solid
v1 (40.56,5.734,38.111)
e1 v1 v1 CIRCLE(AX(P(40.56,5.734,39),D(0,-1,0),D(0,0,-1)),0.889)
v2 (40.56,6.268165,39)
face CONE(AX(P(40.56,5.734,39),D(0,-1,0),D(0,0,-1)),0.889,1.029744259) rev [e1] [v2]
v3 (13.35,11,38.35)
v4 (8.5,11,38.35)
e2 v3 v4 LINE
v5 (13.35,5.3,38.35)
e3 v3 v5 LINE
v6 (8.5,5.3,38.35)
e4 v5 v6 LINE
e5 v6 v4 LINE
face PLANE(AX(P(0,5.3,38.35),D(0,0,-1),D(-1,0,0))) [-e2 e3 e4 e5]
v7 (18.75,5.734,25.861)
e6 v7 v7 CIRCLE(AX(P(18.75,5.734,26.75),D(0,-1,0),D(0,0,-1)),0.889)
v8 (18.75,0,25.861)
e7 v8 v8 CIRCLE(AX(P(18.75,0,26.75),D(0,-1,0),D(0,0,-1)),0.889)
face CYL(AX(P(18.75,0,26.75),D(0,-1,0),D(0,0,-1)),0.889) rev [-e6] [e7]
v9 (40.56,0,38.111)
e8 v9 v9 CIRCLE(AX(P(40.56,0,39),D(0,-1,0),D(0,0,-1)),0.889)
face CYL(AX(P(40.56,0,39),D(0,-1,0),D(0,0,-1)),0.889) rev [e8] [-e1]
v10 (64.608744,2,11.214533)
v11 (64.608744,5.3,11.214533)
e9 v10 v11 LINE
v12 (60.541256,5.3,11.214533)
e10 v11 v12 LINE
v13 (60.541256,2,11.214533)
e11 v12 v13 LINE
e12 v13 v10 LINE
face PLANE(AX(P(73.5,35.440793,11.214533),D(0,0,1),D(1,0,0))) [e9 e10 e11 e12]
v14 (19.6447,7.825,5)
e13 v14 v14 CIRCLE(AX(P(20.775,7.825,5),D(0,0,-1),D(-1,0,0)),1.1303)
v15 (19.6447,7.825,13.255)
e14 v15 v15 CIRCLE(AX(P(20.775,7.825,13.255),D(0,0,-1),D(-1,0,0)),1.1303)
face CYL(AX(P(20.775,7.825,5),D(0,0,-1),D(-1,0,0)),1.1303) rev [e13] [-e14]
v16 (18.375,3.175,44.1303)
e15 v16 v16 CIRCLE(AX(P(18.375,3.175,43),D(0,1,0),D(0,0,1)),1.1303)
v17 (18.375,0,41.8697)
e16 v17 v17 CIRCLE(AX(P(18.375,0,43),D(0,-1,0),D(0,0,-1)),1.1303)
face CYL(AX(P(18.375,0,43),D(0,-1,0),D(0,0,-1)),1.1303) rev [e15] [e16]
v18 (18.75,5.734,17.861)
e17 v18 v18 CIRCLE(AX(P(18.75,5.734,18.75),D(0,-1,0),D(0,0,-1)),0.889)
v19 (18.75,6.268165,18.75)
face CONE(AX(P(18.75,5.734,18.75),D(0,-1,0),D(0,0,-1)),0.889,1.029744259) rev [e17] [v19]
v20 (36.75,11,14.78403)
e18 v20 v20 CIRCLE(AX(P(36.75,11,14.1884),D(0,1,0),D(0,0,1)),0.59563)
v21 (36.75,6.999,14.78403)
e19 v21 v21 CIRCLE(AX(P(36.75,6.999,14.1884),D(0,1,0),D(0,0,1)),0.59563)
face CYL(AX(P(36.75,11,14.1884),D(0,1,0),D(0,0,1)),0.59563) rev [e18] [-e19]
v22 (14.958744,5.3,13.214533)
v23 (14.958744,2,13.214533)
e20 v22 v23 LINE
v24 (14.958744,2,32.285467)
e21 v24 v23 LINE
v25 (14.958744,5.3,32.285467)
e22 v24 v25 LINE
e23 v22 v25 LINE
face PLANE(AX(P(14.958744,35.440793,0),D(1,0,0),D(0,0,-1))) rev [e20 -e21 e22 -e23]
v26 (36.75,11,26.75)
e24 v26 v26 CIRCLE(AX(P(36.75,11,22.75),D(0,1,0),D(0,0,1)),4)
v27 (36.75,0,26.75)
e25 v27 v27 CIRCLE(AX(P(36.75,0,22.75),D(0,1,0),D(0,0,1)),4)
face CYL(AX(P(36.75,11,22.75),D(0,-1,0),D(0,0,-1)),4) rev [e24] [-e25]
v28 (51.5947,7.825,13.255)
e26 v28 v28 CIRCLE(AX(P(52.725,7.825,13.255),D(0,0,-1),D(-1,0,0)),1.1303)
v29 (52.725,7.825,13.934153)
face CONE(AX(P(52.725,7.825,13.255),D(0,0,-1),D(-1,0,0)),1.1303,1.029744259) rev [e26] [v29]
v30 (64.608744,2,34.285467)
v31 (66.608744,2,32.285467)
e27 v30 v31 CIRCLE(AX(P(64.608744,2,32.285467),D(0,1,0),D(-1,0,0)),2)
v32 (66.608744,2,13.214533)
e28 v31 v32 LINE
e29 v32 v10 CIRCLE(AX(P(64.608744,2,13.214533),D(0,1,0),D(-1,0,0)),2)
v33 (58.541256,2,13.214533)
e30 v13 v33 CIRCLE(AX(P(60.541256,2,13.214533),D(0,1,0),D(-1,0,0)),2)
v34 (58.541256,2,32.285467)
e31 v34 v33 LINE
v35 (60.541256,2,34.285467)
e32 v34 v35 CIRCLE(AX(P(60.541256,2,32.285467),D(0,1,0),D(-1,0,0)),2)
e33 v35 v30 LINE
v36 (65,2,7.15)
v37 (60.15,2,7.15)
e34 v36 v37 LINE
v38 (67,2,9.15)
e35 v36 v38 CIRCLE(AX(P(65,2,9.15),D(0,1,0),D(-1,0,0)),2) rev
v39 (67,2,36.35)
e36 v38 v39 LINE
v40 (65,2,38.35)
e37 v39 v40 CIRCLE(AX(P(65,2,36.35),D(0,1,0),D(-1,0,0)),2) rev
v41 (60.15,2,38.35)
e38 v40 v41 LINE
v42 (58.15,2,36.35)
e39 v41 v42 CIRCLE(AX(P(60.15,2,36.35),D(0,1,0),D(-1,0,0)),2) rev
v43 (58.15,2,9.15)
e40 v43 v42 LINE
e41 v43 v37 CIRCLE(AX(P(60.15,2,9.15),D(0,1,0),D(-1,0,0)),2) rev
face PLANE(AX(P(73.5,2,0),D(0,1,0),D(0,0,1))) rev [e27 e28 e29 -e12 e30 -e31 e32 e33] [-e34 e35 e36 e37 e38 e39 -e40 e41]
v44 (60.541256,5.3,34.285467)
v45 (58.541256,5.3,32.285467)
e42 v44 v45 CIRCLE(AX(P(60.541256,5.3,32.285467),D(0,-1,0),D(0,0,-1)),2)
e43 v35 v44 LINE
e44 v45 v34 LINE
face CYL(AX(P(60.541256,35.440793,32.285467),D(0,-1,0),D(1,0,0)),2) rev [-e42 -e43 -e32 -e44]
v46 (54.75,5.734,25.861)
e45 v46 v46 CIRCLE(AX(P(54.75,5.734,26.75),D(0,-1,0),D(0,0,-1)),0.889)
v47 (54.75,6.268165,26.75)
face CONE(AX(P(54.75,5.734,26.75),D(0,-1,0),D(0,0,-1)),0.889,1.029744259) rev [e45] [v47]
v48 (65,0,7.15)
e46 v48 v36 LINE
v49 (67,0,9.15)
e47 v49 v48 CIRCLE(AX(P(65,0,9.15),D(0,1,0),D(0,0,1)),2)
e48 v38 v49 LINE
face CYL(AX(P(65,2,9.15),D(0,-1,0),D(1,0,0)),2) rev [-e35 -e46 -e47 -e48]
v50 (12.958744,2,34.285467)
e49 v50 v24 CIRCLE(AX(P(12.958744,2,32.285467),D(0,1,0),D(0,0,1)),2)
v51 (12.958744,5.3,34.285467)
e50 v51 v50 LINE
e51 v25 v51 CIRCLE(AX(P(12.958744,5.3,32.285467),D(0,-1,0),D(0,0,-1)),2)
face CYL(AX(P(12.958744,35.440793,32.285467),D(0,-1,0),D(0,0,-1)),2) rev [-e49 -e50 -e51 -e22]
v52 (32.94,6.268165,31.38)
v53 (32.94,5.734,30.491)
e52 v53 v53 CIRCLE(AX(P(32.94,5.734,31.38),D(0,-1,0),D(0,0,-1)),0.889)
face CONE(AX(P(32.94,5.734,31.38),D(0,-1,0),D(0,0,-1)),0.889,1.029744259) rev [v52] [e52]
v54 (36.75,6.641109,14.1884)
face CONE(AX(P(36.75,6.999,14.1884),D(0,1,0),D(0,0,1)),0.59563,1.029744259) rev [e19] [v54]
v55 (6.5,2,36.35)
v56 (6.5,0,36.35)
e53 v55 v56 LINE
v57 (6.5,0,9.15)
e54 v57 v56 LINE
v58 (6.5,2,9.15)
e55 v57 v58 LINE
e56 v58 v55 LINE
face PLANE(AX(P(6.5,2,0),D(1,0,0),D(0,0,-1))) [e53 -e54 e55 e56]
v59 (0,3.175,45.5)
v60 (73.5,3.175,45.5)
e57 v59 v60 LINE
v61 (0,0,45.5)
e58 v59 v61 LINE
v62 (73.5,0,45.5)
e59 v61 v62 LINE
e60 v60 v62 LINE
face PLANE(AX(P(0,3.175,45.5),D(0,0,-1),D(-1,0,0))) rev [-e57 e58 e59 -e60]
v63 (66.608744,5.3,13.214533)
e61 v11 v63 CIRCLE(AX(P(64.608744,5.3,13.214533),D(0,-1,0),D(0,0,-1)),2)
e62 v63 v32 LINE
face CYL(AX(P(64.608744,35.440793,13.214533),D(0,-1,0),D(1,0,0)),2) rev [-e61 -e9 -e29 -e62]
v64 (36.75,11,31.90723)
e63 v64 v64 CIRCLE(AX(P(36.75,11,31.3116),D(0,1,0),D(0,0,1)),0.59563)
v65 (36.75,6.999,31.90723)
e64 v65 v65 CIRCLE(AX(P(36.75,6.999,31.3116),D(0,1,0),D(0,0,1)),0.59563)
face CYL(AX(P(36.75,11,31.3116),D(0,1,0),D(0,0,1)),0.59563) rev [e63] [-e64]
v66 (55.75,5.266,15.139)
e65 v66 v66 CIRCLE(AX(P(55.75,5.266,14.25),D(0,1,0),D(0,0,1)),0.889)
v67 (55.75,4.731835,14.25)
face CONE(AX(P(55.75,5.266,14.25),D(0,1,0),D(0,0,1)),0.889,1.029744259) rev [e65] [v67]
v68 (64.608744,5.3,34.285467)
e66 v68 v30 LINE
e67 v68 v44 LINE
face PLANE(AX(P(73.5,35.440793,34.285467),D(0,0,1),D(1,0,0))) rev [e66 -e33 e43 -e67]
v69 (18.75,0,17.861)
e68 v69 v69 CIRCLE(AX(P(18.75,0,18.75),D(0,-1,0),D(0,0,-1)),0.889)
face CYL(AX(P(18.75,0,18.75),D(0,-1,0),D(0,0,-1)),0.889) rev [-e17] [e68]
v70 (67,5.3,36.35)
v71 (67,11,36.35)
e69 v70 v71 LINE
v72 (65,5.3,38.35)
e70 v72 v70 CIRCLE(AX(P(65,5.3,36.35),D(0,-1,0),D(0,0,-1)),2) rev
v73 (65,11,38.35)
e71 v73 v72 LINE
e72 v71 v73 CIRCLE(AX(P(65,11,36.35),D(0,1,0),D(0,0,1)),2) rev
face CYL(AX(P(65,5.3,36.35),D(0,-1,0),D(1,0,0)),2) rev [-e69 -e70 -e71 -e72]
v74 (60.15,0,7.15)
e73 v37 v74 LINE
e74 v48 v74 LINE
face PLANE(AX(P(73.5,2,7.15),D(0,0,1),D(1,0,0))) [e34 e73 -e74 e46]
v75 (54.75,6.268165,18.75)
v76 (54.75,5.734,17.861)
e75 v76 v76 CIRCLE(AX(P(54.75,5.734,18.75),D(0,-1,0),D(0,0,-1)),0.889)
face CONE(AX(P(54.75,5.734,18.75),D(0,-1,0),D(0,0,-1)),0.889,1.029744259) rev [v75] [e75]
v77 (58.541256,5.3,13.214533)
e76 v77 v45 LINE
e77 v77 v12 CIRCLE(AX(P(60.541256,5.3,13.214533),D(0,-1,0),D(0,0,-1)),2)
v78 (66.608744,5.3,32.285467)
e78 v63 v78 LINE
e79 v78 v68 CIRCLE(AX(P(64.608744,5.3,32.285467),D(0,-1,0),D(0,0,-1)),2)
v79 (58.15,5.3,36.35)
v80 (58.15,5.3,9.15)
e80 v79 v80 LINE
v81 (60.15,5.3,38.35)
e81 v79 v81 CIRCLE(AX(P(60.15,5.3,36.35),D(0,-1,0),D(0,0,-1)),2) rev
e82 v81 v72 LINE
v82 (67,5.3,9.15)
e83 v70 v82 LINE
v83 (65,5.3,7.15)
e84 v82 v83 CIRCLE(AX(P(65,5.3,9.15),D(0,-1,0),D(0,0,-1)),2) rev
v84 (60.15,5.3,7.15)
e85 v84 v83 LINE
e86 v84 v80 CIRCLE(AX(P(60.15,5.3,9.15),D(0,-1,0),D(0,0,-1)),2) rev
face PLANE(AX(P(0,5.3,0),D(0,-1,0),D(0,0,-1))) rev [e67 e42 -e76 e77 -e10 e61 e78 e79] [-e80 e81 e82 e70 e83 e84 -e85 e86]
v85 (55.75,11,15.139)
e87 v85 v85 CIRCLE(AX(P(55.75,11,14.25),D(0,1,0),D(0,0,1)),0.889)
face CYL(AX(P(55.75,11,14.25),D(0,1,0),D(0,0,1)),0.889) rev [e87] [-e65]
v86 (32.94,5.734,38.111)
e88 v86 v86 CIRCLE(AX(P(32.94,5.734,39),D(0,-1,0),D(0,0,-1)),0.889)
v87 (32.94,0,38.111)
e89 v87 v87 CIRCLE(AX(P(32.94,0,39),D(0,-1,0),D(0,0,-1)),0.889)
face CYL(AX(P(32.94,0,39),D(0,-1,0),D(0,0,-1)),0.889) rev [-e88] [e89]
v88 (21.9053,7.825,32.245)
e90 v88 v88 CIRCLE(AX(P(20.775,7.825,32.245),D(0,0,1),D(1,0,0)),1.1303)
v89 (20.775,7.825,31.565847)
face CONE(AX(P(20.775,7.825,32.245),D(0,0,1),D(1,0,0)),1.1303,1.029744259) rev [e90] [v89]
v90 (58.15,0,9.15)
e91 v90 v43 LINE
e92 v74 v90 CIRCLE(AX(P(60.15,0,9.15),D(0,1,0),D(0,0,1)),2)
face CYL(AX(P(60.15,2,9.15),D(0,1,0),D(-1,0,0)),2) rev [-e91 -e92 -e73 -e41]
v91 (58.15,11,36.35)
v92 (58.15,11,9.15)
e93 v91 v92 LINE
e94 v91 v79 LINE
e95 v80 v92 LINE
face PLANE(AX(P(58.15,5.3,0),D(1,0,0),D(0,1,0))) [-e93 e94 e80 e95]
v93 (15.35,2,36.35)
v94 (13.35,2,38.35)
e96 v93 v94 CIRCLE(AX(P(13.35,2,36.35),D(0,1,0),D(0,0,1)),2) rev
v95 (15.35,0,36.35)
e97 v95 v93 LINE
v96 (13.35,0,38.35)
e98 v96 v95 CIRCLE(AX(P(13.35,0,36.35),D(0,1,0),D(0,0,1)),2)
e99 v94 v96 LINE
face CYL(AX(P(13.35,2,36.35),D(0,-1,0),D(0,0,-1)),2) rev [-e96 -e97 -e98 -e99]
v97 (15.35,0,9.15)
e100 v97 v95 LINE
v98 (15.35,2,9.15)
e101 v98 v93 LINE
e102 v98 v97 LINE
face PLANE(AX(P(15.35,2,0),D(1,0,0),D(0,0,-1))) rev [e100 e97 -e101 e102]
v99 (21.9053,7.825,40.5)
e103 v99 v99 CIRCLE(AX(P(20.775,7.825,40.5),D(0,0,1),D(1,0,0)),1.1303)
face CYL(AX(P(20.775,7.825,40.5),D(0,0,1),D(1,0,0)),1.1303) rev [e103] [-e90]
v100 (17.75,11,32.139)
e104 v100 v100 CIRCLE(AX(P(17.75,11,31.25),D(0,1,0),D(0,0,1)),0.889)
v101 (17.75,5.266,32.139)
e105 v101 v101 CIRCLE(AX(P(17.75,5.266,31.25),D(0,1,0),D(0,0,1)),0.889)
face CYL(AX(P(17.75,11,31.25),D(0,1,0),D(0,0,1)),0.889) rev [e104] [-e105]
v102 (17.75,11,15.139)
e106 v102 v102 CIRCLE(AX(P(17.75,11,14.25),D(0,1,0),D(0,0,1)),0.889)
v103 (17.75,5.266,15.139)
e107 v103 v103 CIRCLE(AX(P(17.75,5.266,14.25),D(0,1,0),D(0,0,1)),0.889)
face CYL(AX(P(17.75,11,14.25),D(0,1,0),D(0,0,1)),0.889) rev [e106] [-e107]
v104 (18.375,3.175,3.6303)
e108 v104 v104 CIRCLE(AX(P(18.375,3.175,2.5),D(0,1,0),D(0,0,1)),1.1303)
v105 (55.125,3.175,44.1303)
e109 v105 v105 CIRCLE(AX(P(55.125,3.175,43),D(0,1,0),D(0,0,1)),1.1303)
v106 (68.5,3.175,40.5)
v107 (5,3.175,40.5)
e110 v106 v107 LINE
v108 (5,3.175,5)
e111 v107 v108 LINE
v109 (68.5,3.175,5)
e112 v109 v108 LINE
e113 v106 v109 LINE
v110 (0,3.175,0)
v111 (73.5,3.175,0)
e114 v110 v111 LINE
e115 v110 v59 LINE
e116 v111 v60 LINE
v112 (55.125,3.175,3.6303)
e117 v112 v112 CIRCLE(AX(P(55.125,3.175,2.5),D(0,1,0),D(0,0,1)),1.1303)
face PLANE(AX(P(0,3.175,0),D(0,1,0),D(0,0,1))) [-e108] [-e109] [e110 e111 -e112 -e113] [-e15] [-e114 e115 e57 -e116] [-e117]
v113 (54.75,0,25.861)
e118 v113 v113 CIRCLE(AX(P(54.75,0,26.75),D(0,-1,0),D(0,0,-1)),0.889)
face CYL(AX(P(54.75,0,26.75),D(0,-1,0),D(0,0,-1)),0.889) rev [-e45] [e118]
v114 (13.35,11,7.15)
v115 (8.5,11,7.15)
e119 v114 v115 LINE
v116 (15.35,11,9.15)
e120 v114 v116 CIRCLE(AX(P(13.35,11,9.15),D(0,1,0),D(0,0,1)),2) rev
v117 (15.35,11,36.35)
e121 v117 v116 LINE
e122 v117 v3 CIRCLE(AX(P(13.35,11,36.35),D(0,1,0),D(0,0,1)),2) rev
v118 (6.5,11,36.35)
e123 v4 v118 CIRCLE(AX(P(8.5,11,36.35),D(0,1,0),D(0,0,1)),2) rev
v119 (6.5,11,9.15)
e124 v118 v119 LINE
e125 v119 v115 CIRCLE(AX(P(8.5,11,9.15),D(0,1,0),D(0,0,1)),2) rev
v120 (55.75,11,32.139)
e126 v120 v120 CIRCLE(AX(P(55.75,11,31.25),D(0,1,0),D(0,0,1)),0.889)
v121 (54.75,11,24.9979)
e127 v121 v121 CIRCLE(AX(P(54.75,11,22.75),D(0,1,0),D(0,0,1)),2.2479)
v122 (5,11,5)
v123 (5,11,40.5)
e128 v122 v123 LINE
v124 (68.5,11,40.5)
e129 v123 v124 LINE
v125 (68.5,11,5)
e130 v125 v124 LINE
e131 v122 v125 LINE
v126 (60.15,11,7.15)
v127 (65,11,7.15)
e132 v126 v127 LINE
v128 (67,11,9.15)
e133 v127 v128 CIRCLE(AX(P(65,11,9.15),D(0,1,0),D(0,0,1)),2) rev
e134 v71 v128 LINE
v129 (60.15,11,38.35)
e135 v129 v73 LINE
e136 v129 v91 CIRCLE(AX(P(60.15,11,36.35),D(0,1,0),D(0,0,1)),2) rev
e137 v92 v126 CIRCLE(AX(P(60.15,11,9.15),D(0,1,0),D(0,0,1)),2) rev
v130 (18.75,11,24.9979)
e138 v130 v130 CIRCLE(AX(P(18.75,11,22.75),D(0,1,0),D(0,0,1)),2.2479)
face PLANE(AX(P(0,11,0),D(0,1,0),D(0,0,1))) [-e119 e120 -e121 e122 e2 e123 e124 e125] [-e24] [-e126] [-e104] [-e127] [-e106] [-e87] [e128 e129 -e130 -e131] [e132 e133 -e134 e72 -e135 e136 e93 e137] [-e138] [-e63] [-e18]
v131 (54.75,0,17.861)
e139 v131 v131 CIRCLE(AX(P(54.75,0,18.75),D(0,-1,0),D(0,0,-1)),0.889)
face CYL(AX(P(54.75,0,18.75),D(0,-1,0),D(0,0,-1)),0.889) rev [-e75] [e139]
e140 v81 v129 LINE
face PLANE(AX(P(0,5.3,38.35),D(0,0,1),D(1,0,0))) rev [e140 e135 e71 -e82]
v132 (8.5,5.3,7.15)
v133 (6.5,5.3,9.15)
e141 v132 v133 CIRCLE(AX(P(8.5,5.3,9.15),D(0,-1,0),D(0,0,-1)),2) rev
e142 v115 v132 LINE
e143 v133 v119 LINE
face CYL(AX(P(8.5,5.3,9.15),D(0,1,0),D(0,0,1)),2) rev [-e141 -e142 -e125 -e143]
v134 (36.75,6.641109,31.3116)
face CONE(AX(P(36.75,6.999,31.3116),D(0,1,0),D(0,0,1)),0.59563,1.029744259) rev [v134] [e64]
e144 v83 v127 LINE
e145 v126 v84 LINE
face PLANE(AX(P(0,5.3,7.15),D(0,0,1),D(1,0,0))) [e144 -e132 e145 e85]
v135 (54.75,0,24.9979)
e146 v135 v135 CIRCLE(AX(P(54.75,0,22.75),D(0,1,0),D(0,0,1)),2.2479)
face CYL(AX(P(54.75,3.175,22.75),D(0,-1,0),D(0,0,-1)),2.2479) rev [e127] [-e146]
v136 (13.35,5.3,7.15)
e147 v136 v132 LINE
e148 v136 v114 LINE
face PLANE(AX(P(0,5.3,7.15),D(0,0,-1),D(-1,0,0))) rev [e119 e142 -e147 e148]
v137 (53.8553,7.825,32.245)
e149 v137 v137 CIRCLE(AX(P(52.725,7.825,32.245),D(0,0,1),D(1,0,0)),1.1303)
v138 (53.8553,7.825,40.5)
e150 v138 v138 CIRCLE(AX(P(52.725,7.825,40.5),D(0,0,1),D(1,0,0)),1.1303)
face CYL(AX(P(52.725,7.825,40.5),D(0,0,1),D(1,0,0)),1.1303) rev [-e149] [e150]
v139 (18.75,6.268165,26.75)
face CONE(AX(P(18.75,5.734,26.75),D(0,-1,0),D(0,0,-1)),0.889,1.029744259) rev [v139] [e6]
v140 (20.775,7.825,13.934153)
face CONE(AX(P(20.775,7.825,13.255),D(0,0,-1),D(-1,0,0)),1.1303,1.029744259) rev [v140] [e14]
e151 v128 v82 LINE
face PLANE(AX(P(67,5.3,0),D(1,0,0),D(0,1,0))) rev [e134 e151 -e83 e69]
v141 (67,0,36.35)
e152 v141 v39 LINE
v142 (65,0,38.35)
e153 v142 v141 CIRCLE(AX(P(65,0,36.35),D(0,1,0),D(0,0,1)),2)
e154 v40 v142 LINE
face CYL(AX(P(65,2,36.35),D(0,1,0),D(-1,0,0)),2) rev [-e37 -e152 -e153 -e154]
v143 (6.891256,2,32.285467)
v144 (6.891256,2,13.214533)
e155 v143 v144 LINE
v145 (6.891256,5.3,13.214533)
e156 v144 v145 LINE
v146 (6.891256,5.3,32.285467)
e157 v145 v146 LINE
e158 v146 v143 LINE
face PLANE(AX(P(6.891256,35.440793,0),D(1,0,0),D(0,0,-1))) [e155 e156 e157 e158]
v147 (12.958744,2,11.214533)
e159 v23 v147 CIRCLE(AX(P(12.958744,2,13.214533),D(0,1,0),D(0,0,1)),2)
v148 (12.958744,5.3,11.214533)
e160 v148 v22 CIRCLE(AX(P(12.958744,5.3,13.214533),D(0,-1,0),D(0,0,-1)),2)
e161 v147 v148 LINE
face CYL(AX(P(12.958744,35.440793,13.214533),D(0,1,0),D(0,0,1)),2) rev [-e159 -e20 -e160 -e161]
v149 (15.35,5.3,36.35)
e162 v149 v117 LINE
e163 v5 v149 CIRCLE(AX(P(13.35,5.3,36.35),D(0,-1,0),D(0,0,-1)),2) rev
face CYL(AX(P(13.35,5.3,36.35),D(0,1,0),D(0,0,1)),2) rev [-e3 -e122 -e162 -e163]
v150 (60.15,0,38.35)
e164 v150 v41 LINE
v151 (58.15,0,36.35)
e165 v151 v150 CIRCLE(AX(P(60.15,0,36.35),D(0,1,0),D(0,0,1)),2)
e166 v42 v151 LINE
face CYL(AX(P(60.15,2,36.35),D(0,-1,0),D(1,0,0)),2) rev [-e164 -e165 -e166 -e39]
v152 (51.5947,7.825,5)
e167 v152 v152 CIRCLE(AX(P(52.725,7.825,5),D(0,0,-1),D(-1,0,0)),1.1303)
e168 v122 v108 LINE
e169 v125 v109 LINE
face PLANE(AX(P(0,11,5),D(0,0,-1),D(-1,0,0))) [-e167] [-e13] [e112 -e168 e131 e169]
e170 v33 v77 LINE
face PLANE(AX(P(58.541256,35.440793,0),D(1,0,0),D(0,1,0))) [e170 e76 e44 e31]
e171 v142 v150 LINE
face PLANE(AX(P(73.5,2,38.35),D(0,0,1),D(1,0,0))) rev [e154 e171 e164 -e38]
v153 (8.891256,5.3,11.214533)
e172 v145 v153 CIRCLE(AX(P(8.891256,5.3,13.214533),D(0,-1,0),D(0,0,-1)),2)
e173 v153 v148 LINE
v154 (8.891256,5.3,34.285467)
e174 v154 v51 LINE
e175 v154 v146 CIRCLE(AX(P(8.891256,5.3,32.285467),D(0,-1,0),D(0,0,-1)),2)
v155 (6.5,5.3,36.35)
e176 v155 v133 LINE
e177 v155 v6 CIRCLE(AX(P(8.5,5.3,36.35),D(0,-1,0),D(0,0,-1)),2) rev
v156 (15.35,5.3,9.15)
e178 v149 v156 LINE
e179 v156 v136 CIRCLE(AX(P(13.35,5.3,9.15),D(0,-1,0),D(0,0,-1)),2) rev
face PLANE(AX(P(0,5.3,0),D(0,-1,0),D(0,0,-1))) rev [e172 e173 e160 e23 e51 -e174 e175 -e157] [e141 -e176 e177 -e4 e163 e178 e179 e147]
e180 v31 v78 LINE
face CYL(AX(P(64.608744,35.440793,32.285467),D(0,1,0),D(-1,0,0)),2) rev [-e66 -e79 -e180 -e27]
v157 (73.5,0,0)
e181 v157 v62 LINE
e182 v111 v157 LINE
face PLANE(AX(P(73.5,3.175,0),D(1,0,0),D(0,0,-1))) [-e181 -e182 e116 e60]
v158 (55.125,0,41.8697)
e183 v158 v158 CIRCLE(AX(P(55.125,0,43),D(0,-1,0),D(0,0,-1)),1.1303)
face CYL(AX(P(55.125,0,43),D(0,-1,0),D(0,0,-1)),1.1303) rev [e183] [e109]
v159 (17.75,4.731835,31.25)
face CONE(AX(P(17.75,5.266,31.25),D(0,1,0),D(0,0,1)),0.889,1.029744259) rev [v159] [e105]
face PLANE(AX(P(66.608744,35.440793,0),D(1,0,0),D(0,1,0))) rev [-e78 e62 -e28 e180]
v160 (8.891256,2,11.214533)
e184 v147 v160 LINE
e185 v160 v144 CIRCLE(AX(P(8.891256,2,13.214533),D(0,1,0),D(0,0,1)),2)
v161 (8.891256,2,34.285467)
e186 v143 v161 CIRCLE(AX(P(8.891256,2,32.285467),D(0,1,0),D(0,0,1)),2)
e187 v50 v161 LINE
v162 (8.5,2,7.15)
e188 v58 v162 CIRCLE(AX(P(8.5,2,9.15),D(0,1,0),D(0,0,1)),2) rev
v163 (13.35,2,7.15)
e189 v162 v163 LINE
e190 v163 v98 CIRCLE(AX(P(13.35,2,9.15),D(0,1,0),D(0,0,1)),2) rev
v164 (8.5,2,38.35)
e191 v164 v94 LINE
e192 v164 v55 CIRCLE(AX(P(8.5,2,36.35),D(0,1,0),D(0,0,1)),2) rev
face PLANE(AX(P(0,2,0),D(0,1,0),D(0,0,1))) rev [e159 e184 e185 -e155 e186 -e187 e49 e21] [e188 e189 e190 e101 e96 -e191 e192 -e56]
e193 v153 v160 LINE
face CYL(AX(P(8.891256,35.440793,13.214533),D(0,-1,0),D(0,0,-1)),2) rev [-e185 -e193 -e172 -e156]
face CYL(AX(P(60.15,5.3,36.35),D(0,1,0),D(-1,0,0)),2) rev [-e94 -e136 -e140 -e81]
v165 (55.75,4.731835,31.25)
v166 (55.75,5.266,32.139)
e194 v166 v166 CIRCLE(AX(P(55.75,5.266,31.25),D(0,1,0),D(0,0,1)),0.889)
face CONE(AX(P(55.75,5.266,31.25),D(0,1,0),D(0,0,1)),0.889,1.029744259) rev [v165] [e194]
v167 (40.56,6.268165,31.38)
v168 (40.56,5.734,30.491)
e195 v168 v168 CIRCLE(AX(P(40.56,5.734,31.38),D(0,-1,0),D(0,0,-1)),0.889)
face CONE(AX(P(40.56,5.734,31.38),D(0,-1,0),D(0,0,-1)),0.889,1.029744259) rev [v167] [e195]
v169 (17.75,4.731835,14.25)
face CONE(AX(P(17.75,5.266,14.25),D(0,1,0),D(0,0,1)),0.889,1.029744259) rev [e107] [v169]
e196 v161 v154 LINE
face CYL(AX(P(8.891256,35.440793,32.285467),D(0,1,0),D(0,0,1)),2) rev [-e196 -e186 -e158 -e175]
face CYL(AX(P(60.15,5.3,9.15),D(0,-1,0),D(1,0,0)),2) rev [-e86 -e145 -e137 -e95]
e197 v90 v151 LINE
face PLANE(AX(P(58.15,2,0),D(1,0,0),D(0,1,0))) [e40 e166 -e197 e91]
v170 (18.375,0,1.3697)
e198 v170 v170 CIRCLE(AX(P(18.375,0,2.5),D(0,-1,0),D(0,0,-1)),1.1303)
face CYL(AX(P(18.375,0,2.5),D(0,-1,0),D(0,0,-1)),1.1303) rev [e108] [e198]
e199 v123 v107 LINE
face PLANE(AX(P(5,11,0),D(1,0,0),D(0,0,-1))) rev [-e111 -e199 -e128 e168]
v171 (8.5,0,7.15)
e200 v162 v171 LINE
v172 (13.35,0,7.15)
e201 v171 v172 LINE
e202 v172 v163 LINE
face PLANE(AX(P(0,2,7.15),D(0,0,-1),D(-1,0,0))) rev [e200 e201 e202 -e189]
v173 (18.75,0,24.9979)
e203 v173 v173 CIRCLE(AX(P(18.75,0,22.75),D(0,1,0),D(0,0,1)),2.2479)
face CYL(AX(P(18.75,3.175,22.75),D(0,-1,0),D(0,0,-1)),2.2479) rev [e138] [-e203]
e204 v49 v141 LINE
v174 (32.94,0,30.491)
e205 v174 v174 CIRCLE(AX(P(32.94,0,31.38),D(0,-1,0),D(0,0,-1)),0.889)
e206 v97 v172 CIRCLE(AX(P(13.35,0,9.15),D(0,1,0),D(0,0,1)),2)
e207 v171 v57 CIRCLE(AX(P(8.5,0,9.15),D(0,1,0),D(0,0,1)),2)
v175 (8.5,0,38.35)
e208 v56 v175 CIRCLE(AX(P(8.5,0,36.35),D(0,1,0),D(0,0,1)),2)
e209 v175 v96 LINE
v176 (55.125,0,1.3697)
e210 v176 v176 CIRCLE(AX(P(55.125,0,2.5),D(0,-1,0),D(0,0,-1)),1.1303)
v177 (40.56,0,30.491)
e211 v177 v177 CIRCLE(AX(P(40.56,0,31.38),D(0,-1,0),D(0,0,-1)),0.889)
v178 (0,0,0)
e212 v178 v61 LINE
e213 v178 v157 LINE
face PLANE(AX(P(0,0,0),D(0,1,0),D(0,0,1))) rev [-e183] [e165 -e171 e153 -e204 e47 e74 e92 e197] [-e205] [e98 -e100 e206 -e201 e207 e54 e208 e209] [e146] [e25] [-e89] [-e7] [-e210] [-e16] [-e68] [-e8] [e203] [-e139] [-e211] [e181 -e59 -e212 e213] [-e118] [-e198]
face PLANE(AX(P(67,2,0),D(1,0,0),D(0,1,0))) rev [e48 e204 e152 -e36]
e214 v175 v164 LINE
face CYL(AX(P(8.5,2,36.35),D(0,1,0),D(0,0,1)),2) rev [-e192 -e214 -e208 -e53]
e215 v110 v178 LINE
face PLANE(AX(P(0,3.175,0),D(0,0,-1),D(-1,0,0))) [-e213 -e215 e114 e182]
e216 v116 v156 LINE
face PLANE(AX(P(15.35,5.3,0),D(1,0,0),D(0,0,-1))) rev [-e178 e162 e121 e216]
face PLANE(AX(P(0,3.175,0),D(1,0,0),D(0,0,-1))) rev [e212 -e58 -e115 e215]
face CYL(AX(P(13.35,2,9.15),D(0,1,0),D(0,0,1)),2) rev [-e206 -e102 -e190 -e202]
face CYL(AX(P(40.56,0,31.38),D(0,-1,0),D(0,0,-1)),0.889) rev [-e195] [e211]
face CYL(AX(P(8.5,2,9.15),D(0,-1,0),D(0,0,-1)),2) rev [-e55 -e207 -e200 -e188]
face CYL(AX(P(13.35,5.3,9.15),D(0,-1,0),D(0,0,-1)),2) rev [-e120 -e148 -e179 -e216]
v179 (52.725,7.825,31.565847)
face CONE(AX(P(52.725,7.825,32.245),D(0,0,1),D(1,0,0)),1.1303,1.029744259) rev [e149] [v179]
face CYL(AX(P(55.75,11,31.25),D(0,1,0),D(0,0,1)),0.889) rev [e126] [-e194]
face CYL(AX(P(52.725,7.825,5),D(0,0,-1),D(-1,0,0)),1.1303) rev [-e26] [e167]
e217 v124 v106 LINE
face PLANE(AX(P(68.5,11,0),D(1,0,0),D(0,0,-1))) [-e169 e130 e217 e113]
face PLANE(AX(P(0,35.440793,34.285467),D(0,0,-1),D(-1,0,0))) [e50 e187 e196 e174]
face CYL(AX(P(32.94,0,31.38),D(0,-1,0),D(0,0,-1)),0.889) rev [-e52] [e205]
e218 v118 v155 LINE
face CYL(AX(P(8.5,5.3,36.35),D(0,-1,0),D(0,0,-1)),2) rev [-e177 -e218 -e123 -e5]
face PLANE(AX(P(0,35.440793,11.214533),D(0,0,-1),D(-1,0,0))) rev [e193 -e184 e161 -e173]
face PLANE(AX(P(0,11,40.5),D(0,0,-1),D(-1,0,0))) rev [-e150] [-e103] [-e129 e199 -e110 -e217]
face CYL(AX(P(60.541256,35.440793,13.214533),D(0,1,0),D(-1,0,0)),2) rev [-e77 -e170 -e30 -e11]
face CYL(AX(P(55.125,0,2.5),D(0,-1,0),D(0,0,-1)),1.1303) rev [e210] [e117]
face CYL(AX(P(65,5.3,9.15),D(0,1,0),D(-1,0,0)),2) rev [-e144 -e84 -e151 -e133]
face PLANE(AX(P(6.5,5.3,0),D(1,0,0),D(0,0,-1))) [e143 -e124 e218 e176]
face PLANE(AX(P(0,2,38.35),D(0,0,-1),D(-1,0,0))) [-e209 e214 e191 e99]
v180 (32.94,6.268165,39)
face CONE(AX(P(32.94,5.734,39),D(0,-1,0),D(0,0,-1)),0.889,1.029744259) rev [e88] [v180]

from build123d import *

# Parameters (mm, degrees)
MAIN_SKETCH_W                         = 73.5
MAIN_SKETCH_H                         = 45.5
MAIN_SKETCH_W_2                       = 8.85
MAIN_SKETCH_H_2                       = 31.2
MAIN_SKETCH_R                         = 2.2479
LIP_DEPTH                             = 3.175
MOUNTING_BASE_OUTLINE_W               = 63.5
MOUNTING_BASE_OUTLINE_H               = 35.5
MOUNTING_BASE_OUTLINE_R               = 2.2479
MOUNTING_BASE_OUTLINE_R_2             = 4
MOUNTING_BASE_DEPTH                   = 11
HEATER_CART_4_40_TAPS_D               = 2.2606
HEATER_CART_4_40_TAPS_DEPTH           = 8.255
HEATER_CART_4_40_TAPS_TIP             = 0.679152758
HEATER_CART_4_40_TAPS_ON_FACE_2_D     = 2.2606
HEATER_CART_4_40_TAPS_ON_FACE_2_DEPTH = 8.255
HEATER_CART_4_40_TAPS_ON_FACE_2_TIP   = 0.679152758
MAIN_SKETCH_12_W                      = 8.85
MAIN_SKETCH_12_H                      = 31.2
MAIN_SKETCH_12_R                      = 0.285
BOTTOM_SQUARE_CUTOUT_DEPTH            = 2
SQUARE_MICRO_D_CUTOUT_START           = 5.3
SQUARE_MICRO_D_CUTOUT_OUTLINE_W       = 8.85
SQUARE_MICRO_D_CUTOUT_OUTLINE_H       = 31.2
SQUARE_MICRO_D_CUTOUT_OUTLINE_R       = 0.285
SQUARE_MICRO_D_CUTOUT_DEPTH           = 5.7
SKETCH15_W                            = 8.067488146
SKETCH15_H                            = 23.070933647
CUT_EXTRUDE1_DEPTH                    = 11
INTERNAL_CORNER_CUTOUTS_FILLET_R      = 2
CHIP_CLAMP_0_80_TAPS_AT_2_COUNT       = 2
CHIP_CLAMP_0_80_TAPS_AT_2_PITCH       = 17.1232
CHIP_CLAMP_0_80_TAPS_AT_3_COUNT       = 2
CHIP_CLAMP_0_80_TAPS_AT_3_PITCH       = 17.1232
F_2_56_CLOSE_CLEAR_43_0_089_D         = 2.2606
PCB_2_56_TAPS_D                       = 1.778
PCB_2_56_TAPS_DEPTH                   = 5.734
PCB_2_56_TAPS_TIP                     = 0.53416509
BOTTOM_COVER_2_56_TAPS_D              = 1.778
BOTTOM_COVER_2_56_TAPS_DEPTH          = 5.734
BOTTOM_COVER_2_56_TAPS_TIP            = 0.53416509
F_2_56_TAPPED_HOLE1_D                 = 1.778
F_2_56_TAPPED_HOLE1_DEPTH             = 5.734
F_2_56_TAPPED_HOLE1_TIP               = 0.53416509


# Read off the part's stored shape, not the designer's step: Mounting_Base, Square_Micro_D_Cutout
with BuildPart() as part:
    # Main_Sketch → Lip (new body)
    with BuildSketch(Plane(origin=(0, 0, 0), x_dir=(1, 0, 0), z_dir=(0, 1, 0))):
        with Locations((36.75, -22.75)):
            Rectangle(MAIN_SKETCH_W, MAIN_SKETCH_H)
        with Locations((10.925, -22.749999985)):
            Rectangle(MAIN_SKETCH_W_2, MAIN_SKETCH_H_2, mode=Mode.SUBTRACT)
        with Locations(Location((18.75, -22.75, 0), (0, 0, 270))):
            Circle(MAIN_SKETCH_R, mode=Mode.SUBTRACT)
        with BuildLine():
            ThreePointArc((31.675, -20.175), (29.907233047, -15.907233047), (34.175, -17.675))
            Line((34.175, -17.675), (39.325, -17.675))
            ThreePointArc((39.325, -17.675), (43.592766953, -15.907233047), (41.825, -20.175))
            Line((41.825, -20.175), (41.825, -25.325))
            ThreePointArc((41.825, -25.325), (43.592766953, -29.592766953), (39.325, -27.825))
            Line((39.325, -27.825), (34.175, -27.825))
            ThreePointArc((34.175, -27.825), (29.907233047, -29.592766953), (31.675, -25.325))
            Line((31.675, -25.325), (31.675, -20.175))
        make_face(mode=Mode.SUBTRACT)
        with Locations(Location((54.75, -22.75, 0), (0, 0, 270))):
            Circle(MAIN_SKETCH_R, mode=Mode.SUBTRACT)
    extrude(amount=LIP_DEPTH)

    # Mounting_Base outline → Mounting_Base (add)
    with BuildSketch(Plane(origin=(0, 0, 0), x_dir=(1, 0, 0), z_dir=(0, 1, 0))):
        with Locations((36.75, -22.75)):
            Rectangle(MOUNTING_BASE_OUTLINE_W, MOUNTING_BASE_OUTLINE_H)
        with Locations((18.75, -22.75)):
            Circle(MOUNTING_BASE_OUTLINE_R, mode=Mode.SUBTRACT)
        with Locations((54.75, -22.75)):
            Circle(MOUNTING_BASE_OUTLINE_R, mode=Mode.SUBTRACT)
        with Locations((36.75, -22.75)):
            Circle(MOUNTING_BASE_OUTLINE_R_2, mode=Mode.SUBTRACT)
    extrude(amount=MOUNTING_BASE_DEPTH)

    # Heater_Cart_#4-40_Taps
    with Locations(Plane(origin=(52.725, 7.825, 5), x_dir=(-1, 0, 0), z_dir=(0, 0, -1))):
        with Locations((0, 0), (31.95, 0)):
            Hole(HEATER_CART_4_40_TAPS_D / 2, depth=HEATER_CART_4_40_TAPS_DEPTH)
            with Locations((0, 0, -(HEATER_CART_4_40_TAPS_DEPTH + HEATER_CART_4_40_TAPS_TIP / 2))):  # 118° drill point
                Cone(0, HEATER_CART_4_40_TAPS_D / 2, HEATER_CART_4_40_TAPS_TIP, mode=Mode.SUBTRACT)

    # Heater_Cart_#4-40_Taps on face 2
    with Locations(Plane(origin=(20.775, 7.825, 40.5), x_dir=(1, 0, 0), z_dir=(0, 0, 1))):
        with Locations((0, 0), (31.95, 0)):
            Hole(HEATER_CART_4_40_TAPS_ON_FACE_2_D / 2, depth=HEATER_CART_4_40_TAPS_ON_FACE_2_DEPTH)
            with Locations((0, 0, -(HEATER_CART_4_40_TAPS_ON_FACE_2_DEPTH + HEATER_CART_4_40_TAPS_ON_FACE_2_TIP / 2))):  # 118° drill point
                Cone(0, HEATER_CART_4_40_TAPS_ON_FACE_2_D / 2, HEATER_CART_4_40_TAPS_ON_FACE_2_TIP, mode=Mode.SUBTRACT)

    # Main_Sketch<12> → Bottom_square_cutout (cut)
    # profile 1 of 2: a face of its own
    with BuildSketch(Plane(origin=(0, 0, 0), x_dir=(1, 0, 0), z_dir=(0, 1, 0))):
        with Locations((10.925, -22.749999985)):
            Rectangle(MAIN_SKETCH_12_W, MAIN_SKETCH_12_H)
        with BuildLine():
            ThreePointArc((10.385689992, -35.285466808), (9.155254643, -35.471894814), (7.986136174, -35.045410869))
            ThreePointArc((7.986136174, -35.045410869), (7.18175843, -34.143309058), (6.891255927, -32.970099985))
            Line((6.891255927, -32.970099985), (6.891255927, -12.529899985))
            ThreePointArc((6.891255927, -12.529899985), (7.18175845, -11.356690961), (7.986136174, -10.454589189))
            ThreePointArc((7.986136174, -10.454589189), (9.155254643, -10.028105244), (10.385689992, -10.21453325))
            Line((10.385689992, -10.21453325), (13.424612074, -11.500982853))
            ThreePointArc((13.424612074, -11.500982853), (14.540409069, -12.427601581), (14.958744073, -13.816349588))
            Line((14.958744073, -13.816349588), (14.958744073, -31.683650456))
            ThreePointArc((14.958744073, -31.683650456), (14.540409073, -33.072398471), (13.424612074, -33.999017205))
            Line((13.424612074, -33.999017205), (10.385689992, -35.285466808))
        make_face(mode=Mode.SUBTRACT)
    # profile 2 of 2: a face of its own
    with BuildSketch(Plane(origin=(0, 0, 0), x_dir=(1, 0, 0), z_dir=(0, 1, 0))):
        with BuildLine():
            ThreePointArc((7.986136174, -35.045410869), (7.18175843, -34.143309058), (6.891255927, -32.970099985))
            Line((6.891255927, -32.970099985), (6.891255927, -12.529899985))
            ThreePointArc((6.891255927, -12.529899985), (7.18175845, -11.356690961), (7.986136174, -10.454589189))
            ThreePointArc((7.986136174, -10.454589189), (9.155254643, -10.028105244), (10.385689992, -10.21453325))
            Line((10.385689992, -10.21453325), (13.424612074, -11.500982853))
            ThreePointArc((13.424612074, -11.500982853), (14.540409069, -12.427601581), (14.958744073, -13.816349588))
            Line((14.958744073, -13.816349588), (14.958744073, -31.683650456))
            ThreePointArc((14.958744073, -31.683650456), (14.540409073, -33.072398471), (13.424612074, -33.999017205))
            Line((13.424612074, -33.999017205), (10.385689992, -35.285466808))
            ThreePointArc((10.385689992, -35.285466808), (9.155254643, -35.471894814), (7.986136174, -35.045410869))
        make_face()
        with Locations(Location((10.239255927, -22.75, 0), (0, 0, 270))):
            Circle(MAIN_SKETCH_12_R, mode=Mode.SUBTRACT)
    bottom_square_cutout = extrude(amount=BOTTOM_SQUARE_CUTOUT_DEPTH, mode=Mode.SUBTRACT)

    # Square_Micro_D_Cutout outline → Square_Micro_D_Cutout (cut)
    with BuildSketch(Plane(origin=(0, 0, 0), x_dir=(1, 0, 0), z_dir=(0, 1, 0)).offset(SQUARE_MICRO_D_CUTOUT_START)):
        with Locations((10.925, -22.749999985)):
            Rectangle(SQUARE_MICRO_D_CUTOUT_OUTLINE_W, SQUARE_MICRO_D_CUTOUT_OUTLINE_H)
        with Locations((10.239255927, -22.75)):
            Circle(SQUARE_MICRO_D_CUTOUT_OUTLINE_R, mode=Mode.SUBTRACT)
    square_micro_d_cutout = extrude(amount=SQUARE_MICRO_D_CUTOUT_DEPTH, mode=Mode.SUBTRACT)

    # Sketch15 → Cut-Extrude1 (cut)
    with BuildSketch(Plane(origin=(0, 0, 0), x_dir=(1, 0, 0), z_dir=(0, 1, 0))):
        with Locations((10.925, -22.749999985)):
            Rectangle(SKETCH15_W, SKETCH15_H)
    cut_extrude1 = extrude(amount=CUT_EXTRUDE1_DEPTH, mode=Mode.SUBTRACT)

    # MicroD_Mirror: Bottom_square_cutout, Square_Micro_D_Cutout, Cut-Extrude1 across plane
    add(bottom_square_cutout.mirror(Plane(origin=(36.75, 0, 0), x_dir=(0, 0, 1), z_dir=(1, 0, 0))), mode=Mode.SUBTRACT)
    add(square_micro_d_cutout.mirror(Plane(origin=(36.75, 0, 0), x_dir=(0, 0, 1), z_dir=(1, 0, 0))), mode=Mode.SUBTRACT)
    add(cut_extrude1.mirror(Plane(origin=(36.75, 0, 0), x_dir=(0, 0, 1), z_dir=(1, 0, 0))), mode=Mode.SUBTRACT)

    # Internal_Corner_cutouts_fillet
    internal_corner_cutouts_fillet_edges = [part.edges().sort_by_distance(p)[0] for p in [
        (15.35, 1, 38.349999985),
        (15.35, 1, 7.149999985),
        (6.5, 1, 7.149999985),
        (6.5, 1, 38.349999985),
        (15.35, 8.15, 38.349999985),
        (6.5, 8.15, 38.349999985),
        (6.5, 8.15, 7.149999985),
        (15.35, 8.15, 7.149999985),
        (14.958744073, 3.65, 34.285466808),
        (14.958744073, 3.65, 11.214533161),
        (6.891255927, 3.65, 11.214533161),
        (6.891255927, 3.65, 34.285466808),
        (58.15, 1, 7.149999985),
        (58.15, 1, 38.349999985),
        (67, 1, 38.349999985),
        (67, 1, 7.149999985),
        (67, 8.15, 7.149999985),
        (67, 8.15, 38.349999985),
        (58.15, 8.15, 38.349999985),
        (58.15, 8.15, 7.149999985),
        (58.541255927, 3.65, 11.214533161),
        (58.541255927, 3.65, 34.285466808),
        (66.608744073, 3.65, 34.285466808),
        (66.608744073, 3.65, 11.214533161),
    ]]
    fillet(internal_corner_cutouts_fillet_edges, radius=INTERNAL_CORNER_CUTOUTS_FILLET_R)

    # Sketch3 → Chip_Clamp_#0-80 Taps (revolve, cut)
    with BuildSketch(Plane(origin=(36.75, 11, 31.3116), x_dir=(0, 0, 1), z_dir=(1, 0, 0))):
        Polygon((0, 0), (0, 4.358890611), (0.59563, 4.001), (0.59563, 0), align=None)
    chip_clamp_0_80_taps = revolve(axis=Axis((36.75, 17.35, 31.3116), (0, -1, 0)), mode=Mode.SUBTRACT)

    # Chip_Clamp_#0-80 Taps at 2: Chip_Clamp_#0-80 Taps ×2
    with Locations(*[(0, 0, -i * CHIP_CLAMP_0_80_TAPS_AT_2_PITCH) for i in range(1, CHIP_CLAMP_0_80_TAPS_AT_2_COUNT)]):
        add(chip_clamp_0_80_taps, mode=Mode.SUBTRACT)

    # Chip_Clamp_#0-80 Taps at 3: Chip_Clamp_#0-80 Taps ×2
    with Locations(*[(0, 0, -i * CHIP_CLAMP_0_80_TAPS_AT_3_PITCH) for i in range(1, CHIP_CLAMP_0_80_TAPS_AT_3_COUNT)]):
        add(chip_clamp_0_80_taps, mode=Mode.SUBTRACT)

    # 2-56_Close_Clear#43 (0.089) (through all)
    with Locations(Plane(origin=(18.375, 0, 43), x_dir=(0, 0, -1), z_dir=(0, -1, 0))):
        with Locations((0, 0), (40.5, 0), (40.5, 36.75), (0, 36.75)):
            Hole(F_2_56_CLOSE_CLEAR_43_0_089_D / 2)

    # PCB #2-56 Taps
    with Locations(Plane(origin=(17.75, 11, 14.25), x_dir=(0, 0, 1), z_dir=(0, 1, 0))):
        with Locations((0, 0), (17, 0), (0, 38), (17, 38)):
            Hole(PCB_2_56_TAPS_D / 2, depth=PCB_2_56_TAPS_DEPTH)
            with Locations((0, 0, -(PCB_2_56_TAPS_DEPTH + PCB_2_56_TAPS_TIP / 2))):  # 118° drill point
                Cone(0, PCB_2_56_TAPS_D / 2, PCB_2_56_TAPS_TIP, mode=Mode.SUBTRACT)

    # Bottom_Cover#2-56 Taps
    with Locations(Plane(origin=(54.75, 0, 18.75), x_dir=(0, 0, -1), z_dir=(0, -1, 0))):
        with Locations((0, 0), (-8, 0), (-8, -36), (0, -36)):
            Hole(BOTTOM_COVER_2_56_TAPS_D / 2, depth=BOTTOM_COVER_2_56_TAPS_DEPTH)
            with Locations((0, 0, -(BOTTOM_COVER_2_56_TAPS_DEPTH + BOTTOM_COVER_2_56_TAPS_TIP / 2))):  # 118° drill point
                Cone(0, BOTTOM_COVER_2_56_TAPS_D / 2, BOTTOM_COVER_2_56_TAPS_TIP, mode=Mode.SUBTRACT)

    # #2-56 Tapped Hole1
    with Locations(Plane(origin=(32.94, 0, 31.38), x_dir=(0, 0, -1), z_dir=(0, -1, 0))):
        with Locations((0, 0), (-7.62, 0), (-7.62, 7.62), (0, 7.62)):
            Hole(F_2_56_TAPPED_HOLE1_D / 2, depth=F_2_56_TAPPED_HOLE1_DEPTH)
            with Locations((0, 0, -(F_2_56_TAPPED_HOLE1_DEPTH + F_2_56_TAPPED_HOLE1_TIP / 2))):  # 118° drill point
                Cone(0, F_2_56_TAPPED_HOLE1_D / 2, F_2_56_TAPPED_HOLE1_TIP, mode=Mode.SUBTRACT)


solid = part.part
